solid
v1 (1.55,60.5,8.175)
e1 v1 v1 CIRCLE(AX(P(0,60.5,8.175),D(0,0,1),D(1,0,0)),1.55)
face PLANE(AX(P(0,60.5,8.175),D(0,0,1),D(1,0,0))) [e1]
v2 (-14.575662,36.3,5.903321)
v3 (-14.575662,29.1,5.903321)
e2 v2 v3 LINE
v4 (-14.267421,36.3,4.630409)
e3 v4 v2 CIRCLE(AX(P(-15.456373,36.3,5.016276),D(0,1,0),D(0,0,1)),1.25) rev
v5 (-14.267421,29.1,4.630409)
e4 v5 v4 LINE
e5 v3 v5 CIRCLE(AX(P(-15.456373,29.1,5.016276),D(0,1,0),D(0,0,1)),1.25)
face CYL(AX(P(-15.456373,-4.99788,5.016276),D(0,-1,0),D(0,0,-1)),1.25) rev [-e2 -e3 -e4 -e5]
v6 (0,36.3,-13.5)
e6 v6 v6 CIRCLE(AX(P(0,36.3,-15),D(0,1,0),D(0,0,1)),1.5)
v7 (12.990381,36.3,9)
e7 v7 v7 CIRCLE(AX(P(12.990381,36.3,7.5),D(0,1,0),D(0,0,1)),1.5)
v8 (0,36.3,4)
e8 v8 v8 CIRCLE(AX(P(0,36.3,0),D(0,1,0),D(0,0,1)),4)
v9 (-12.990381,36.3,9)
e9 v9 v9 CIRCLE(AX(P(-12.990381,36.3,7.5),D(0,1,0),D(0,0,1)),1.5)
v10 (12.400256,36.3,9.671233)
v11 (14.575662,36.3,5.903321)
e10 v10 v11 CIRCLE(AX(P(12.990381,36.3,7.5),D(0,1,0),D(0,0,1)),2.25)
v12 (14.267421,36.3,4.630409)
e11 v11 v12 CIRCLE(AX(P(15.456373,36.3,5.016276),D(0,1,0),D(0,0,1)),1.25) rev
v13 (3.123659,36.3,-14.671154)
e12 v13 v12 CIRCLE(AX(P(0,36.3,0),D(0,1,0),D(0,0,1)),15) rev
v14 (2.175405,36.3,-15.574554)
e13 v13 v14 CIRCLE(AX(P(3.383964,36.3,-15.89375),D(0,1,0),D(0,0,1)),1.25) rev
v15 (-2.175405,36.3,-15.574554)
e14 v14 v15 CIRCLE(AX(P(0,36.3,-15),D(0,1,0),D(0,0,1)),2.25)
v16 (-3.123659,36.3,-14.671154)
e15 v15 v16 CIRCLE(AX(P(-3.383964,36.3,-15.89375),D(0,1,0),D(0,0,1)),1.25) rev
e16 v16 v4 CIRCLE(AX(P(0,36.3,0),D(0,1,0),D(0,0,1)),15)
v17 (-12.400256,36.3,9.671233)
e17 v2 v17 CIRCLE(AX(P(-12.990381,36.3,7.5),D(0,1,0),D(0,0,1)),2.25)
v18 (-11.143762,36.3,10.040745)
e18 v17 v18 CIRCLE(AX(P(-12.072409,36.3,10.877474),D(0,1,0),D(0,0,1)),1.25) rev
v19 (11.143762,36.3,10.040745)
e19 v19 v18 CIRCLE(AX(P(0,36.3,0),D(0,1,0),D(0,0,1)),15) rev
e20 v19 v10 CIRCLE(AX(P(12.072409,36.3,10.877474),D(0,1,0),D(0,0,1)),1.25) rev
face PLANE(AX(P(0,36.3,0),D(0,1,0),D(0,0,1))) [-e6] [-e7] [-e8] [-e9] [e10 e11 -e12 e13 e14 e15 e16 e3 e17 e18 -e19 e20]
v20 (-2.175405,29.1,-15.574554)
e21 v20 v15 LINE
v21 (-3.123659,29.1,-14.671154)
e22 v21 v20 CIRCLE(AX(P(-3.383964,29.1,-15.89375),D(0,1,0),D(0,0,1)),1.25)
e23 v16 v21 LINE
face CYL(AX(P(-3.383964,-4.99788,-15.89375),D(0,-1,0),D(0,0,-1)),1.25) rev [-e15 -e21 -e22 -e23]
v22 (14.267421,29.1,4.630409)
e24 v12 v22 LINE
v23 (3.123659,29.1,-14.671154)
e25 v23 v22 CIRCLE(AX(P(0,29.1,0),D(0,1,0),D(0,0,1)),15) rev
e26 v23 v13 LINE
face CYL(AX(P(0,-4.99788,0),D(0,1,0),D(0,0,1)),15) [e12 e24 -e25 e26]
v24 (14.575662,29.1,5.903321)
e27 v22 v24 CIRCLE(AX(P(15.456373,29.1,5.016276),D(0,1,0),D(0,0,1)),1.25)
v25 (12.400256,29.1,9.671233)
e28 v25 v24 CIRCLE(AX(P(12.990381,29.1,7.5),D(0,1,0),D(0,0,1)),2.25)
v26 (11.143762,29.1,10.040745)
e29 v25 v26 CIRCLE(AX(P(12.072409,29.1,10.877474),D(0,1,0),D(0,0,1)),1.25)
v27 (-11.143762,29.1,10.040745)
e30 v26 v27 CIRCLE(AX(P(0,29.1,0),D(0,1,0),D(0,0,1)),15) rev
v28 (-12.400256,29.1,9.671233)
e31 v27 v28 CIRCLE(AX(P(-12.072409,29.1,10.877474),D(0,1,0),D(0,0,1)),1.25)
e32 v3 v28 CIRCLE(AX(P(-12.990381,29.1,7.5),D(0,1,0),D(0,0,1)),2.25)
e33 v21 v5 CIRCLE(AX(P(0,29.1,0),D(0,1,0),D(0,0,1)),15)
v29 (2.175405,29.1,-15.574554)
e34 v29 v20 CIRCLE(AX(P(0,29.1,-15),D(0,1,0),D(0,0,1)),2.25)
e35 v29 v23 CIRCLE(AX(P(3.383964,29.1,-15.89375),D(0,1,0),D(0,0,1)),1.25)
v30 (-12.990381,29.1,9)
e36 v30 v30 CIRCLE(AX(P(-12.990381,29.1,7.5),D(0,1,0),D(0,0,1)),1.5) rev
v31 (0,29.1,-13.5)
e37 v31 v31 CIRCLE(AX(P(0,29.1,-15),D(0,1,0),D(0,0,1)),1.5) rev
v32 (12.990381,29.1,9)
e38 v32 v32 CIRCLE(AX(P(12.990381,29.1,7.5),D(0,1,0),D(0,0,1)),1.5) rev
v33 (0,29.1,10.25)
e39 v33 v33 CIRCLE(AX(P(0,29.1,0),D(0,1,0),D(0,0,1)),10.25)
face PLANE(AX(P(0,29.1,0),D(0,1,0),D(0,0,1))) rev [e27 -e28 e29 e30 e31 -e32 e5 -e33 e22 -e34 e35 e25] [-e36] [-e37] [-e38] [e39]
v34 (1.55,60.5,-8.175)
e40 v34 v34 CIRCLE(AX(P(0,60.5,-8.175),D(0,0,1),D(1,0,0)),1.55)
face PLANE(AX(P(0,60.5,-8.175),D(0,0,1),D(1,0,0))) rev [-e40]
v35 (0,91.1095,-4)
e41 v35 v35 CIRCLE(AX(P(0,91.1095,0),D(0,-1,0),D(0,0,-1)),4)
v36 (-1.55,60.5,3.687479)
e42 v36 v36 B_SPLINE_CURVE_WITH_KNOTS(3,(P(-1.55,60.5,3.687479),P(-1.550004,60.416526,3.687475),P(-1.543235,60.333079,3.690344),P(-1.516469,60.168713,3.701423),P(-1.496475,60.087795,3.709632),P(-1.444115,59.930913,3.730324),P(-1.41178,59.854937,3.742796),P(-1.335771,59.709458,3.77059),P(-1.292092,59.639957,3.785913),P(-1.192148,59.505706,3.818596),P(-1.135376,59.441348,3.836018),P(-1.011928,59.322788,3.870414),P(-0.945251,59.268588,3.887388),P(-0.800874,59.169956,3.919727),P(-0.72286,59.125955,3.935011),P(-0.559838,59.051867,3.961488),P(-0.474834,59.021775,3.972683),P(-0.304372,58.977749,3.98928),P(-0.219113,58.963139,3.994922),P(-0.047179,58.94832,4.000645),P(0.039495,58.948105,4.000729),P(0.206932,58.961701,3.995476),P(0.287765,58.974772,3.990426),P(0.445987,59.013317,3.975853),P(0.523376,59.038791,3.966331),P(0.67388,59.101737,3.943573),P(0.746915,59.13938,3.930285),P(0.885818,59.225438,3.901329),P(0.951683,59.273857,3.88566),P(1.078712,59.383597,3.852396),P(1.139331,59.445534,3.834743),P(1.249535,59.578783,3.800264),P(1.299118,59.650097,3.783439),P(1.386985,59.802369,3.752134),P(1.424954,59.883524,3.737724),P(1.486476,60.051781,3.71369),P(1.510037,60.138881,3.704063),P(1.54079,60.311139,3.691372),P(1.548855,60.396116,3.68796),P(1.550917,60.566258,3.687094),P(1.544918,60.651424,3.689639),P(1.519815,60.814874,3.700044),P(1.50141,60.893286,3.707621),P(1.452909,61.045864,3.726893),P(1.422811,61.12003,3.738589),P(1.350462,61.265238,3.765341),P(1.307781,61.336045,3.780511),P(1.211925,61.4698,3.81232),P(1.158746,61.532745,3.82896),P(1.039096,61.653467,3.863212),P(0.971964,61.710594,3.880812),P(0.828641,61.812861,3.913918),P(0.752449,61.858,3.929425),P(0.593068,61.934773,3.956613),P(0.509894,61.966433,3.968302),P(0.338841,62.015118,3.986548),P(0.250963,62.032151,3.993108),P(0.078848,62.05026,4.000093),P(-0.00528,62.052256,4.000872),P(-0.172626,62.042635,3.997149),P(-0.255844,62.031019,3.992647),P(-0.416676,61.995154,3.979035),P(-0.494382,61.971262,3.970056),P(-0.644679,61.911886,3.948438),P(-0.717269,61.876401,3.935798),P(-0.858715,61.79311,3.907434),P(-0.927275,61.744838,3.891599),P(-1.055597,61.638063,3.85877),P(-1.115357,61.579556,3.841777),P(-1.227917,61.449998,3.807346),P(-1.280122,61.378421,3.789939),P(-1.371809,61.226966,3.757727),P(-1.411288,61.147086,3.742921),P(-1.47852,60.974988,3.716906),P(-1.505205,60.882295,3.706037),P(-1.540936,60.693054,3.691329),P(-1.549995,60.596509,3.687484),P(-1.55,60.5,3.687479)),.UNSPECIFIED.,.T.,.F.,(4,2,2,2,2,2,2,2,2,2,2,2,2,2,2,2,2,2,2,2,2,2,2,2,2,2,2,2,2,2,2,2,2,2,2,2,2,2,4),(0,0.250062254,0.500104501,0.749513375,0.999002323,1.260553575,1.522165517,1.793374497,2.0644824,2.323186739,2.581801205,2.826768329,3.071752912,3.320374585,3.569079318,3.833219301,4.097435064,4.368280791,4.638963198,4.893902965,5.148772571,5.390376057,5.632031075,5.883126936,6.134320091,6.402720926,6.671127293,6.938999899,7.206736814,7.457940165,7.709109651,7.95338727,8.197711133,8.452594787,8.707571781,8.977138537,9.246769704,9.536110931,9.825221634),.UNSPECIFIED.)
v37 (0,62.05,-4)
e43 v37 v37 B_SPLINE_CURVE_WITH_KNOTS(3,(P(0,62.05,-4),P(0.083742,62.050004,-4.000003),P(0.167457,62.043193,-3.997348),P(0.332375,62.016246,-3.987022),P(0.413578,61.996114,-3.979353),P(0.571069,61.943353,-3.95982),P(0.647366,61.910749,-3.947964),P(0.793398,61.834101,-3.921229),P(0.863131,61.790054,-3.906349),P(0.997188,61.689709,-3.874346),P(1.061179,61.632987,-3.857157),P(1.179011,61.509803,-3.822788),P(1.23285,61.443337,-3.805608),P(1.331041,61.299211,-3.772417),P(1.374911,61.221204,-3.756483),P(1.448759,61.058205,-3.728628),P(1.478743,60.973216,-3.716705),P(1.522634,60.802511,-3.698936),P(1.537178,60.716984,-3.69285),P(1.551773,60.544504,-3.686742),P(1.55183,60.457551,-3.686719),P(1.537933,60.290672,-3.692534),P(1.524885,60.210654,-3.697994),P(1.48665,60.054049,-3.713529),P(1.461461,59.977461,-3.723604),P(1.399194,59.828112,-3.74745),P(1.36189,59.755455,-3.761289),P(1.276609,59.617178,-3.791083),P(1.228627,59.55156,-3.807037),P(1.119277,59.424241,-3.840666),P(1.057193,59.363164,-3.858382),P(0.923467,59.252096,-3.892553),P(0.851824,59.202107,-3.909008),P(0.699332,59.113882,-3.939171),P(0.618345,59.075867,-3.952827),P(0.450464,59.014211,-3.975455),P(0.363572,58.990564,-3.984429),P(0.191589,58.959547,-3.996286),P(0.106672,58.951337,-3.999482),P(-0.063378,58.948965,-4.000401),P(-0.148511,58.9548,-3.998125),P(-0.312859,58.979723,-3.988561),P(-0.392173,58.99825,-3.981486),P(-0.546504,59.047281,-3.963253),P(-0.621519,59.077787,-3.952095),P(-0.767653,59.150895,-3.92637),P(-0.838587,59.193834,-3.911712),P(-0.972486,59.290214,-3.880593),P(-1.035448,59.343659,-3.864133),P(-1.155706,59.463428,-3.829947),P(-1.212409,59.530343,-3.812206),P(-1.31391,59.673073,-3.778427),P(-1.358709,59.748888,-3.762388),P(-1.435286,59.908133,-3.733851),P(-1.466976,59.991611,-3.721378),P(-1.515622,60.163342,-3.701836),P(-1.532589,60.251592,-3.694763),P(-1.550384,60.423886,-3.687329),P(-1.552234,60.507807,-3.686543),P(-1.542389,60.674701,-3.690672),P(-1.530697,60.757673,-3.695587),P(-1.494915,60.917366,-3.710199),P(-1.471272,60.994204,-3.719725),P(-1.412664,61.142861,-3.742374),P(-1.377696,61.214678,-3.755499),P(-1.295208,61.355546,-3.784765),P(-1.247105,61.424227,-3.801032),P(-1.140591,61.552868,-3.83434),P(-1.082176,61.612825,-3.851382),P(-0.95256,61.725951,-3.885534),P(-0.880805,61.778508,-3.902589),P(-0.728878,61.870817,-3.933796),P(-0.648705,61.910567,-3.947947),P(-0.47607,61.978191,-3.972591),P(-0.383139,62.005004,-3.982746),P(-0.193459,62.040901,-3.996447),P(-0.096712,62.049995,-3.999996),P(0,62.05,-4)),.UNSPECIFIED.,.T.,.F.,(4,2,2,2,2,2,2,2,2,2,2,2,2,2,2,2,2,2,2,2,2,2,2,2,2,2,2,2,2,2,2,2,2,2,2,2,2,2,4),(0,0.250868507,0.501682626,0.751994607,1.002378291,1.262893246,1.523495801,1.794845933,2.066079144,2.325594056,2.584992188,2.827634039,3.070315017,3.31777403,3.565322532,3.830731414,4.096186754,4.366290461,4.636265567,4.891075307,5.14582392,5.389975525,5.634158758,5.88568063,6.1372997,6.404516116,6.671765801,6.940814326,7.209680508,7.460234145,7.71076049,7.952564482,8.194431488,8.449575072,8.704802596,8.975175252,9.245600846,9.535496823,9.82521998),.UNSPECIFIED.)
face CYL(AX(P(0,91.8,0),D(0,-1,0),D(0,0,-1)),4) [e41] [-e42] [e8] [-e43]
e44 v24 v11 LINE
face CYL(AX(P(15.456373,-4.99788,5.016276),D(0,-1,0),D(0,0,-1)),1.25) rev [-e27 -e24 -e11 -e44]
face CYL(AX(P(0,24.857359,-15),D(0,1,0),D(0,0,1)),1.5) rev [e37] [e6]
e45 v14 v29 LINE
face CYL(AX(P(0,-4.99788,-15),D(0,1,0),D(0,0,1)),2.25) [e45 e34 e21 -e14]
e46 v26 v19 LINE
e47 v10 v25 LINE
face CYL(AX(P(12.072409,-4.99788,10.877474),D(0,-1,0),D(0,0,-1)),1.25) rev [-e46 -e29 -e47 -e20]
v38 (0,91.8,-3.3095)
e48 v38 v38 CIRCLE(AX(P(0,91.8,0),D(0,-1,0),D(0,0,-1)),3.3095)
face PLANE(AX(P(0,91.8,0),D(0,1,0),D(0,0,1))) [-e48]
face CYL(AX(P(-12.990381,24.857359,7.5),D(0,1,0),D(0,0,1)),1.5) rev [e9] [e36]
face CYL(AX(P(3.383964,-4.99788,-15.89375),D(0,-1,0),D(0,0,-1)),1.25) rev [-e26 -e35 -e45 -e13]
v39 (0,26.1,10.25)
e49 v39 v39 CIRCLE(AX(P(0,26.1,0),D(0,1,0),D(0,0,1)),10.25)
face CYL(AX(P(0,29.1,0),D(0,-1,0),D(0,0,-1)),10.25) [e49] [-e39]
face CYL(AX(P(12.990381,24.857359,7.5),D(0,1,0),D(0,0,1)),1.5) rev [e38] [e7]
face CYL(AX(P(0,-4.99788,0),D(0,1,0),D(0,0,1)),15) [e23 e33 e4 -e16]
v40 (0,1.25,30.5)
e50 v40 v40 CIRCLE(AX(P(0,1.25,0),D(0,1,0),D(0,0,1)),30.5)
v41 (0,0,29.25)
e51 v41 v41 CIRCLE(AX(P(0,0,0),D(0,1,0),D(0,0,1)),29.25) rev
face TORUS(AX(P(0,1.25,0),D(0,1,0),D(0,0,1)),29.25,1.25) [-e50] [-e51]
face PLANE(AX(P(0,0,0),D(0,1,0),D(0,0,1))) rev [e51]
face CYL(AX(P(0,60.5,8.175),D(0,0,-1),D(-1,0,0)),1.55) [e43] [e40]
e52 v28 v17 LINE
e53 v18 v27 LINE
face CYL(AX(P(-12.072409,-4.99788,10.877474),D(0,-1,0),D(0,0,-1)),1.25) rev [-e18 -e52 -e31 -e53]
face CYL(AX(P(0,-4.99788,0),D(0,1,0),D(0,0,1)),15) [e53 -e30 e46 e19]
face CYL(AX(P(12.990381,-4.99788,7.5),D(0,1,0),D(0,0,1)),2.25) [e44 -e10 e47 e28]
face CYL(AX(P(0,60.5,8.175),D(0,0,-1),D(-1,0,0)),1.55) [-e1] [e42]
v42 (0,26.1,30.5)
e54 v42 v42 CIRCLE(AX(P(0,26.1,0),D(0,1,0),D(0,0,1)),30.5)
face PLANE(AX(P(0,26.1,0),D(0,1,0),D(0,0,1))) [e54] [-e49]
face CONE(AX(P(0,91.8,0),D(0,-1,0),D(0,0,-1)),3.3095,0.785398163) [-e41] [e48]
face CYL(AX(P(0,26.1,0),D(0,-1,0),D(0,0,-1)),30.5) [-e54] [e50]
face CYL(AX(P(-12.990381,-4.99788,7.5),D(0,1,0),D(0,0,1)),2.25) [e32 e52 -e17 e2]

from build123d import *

# Parameters (mm, degrees)
SKETCH1_R           = 30.5
BOSS_EXTRUDE1_DEPTH = 26.1
SKETCH2_R           = 10.25
BOSS_EXTRUDE2_DEPTH = 3
SKETCH3_R           = 17.25
BOSS_EXTRUDE3_DEPTH = 7.2
CUT_EXTRUDE1_START  = -10.2
CUT_EXTRUDE1_DEPTH  = 10.2
SKETCH4_4_R         = 1.5
CUT_EXTRUDE2_DEPTH  = 7.2
SKETCH7_R           = 4
BOSS_EXTRUDE4_DEPTH = 55.5
FILLET1_R           = 1.25
SKETCH8_R           = 1.55
BOSS_EXTRUDE5_DEPTH = 8.175


# Read off the part's stored shape, not the designer's step: M8x1.25 Machine Threads Stud1
with BuildPart() as part:
    # Sketch1 → Boss-Extrude1 (new body)
    with BuildSketch(Plane(origin=(0, 0, 0), x_dir=(1, 0, 0), z_dir=(0, 1, 0))):
        with Locations(Location((0, 0, 0), (0, 0, 270))):
            Circle(SKETCH1_R)
    extrude(amount=BOSS_EXTRUDE1_DEPTH)

    # Sketch2 → Boss-Extrude2 (add)
    with BuildSketch(Plane(origin=(0, 26.1, 0), x_dir=(1, 0, 0), z_dir=(0, 1, 0))):
        with Locations(Location((0, 0, 0), (0, 0, 270))):
            Circle(SKETCH2_R)
    extrude(amount=BOSS_EXTRUDE2_DEPTH)

    # Sketch3 → Boss-Extrude3 (add)
    with BuildSketch(Plane(origin=(0, 29.1, 0), x_dir=(1, 0, 0), z_dir=(0, 1, 0))):
        with Locations(Location((0, 0, 0), (0, 0, 270))):
            Circle(SKETCH3_R)
    extrude(amount=BOSS_EXTRUDE3_DEPTH)

    # Sketch4 → Cut-Extrude1 (cut)
    with BuildSketch(Plane(origin=(0, 36.3, 0), x_dir=(1, 0, 0), z_dir=(0, 1, 0)).offset(CUT_EXTRUDE1_START)):
        with BuildLine():
            ThreePointArc((-13.966070745, -5.472555887), (-12.990381057, 7.5), (-2.243662951, 14.83125))
            ThreePointArc((-2.243662951, 14.83125), (-1.649573809, 16.530165432), (0, 17.25))
            ThreePointArc((0, 17.25), (-14.938938189, 8.625000045), (-14.938938267, -8.62499991))
            ThreePointArc((-14.938938267, -8.62499991), (-15.140330082, -6.836509843), (-13.966070745, -5.472555887))
        make_face()
        with BuildLine():
            ThreePointArc((2.243662951, 14.83125), (12.990381057, 7.5), (13.966070745, -5.472555887))
            ThreePointArc((13.966070745, -5.472555887), (15.140330099, -6.836509898), (14.938938209, -8.62500001))
            ThreePointArc((14.938938209, -8.62500001), (14.938938218, 8.624999995), (0, 17.25))
            ThreePointArc((0, 17.25), (1.649573809, 16.530165432), (2.243662951, 14.83125))
        make_face()
        with BuildLine():
            ThreePointArc((11.722407794, -9.358694113), (0, -15), (-11.722407794, -9.358694113))
            ThreePointArc((-11.722407794, -9.358694113), (-13.49075634, -9.693655528), (-14.938938267, -8.62499991))
            ThreePointArc((-14.938938267, -8.62499991), (-5.8e-08, -17.25), (14.938938209, -8.62500001))
            ThreePointArc((14.938938209, -8.62500001), (13.490756283, -9.693655541), (11.722407794, -9.358694113))
        make_face()
    extrude(amount=CUT_EXTRUDE1_DEPTH, mode=Mode.SUBTRACT)

    # Sketch4<4> → Cut-Extrude2 (cut)
    with BuildSketch(Plane(origin=(0, 36.3, 0), x_dir=(1, 0, 0), z_dir=(0, 1, 0))):
        with Locations(Location((0, 15, 0), (0, 0, 270))):
            Circle(SKETCH4_4_R)
        with Locations(Location((12.990381057, -7.5, 0), (0, 0, 270))):
            Circle(SKETCH4_4_R)
        with Locations(Location((-12.990381057, -7.5, 0), (0, 0, 270))):
            Circle(SKETCH4_4_R)
    extrude(amount=-CUT_EXTRUDE2_DEPTH, mode=Mode.SUBTRACT)

    # Sketch7 → Boss-Extrude4 (add)
    with BuildSketch(Plane(origin=(0, 36.3, 0), x_dir=(1, 0, 0), z_dir=(0, 1, 0))):
        with Locations(Location((0, 0, 0), (0, 0, 270))):
            Circle(SKETCH7_R)
    extrude(amount=BOSS_EXTRUDE4_DEPTH)

    # Fillet1
    fillet1_edges = [part.edges().sort_by_distance(p)[0] for p in [
        (0, 0, -30.5),
        (-13.966070745, 32.7, 5.472555887),
        (-2.243662951, 32.7, -14.83125),
        (13.966070745, 32.7, 5.472555887),
        (2.243662951, 32.7, -14.83125),
        (-11.722407794, 32.7, 9.358694113),
        (11.722407794, 32.7, 9.358694113),
    ]]
    fillet(fillet1_edges, radius=FILLET1_R)

    # Sketch8 → Boss-Extrude5 (add, symmetric)
    with BuildSketch(Plane.XY):
        with Locations(Location((0, 60.5, 0), (0, 0, 180))):
            Circle(SKETCH8_R)
    extrude(amount=BOSS_EXTRUDE5_DEPTH, both=True)

    # M8x1.25 Machine Threads Stud1 outline → M8x1.25 Machine Threads Stud1 (revolve, cut)
    with BuildSketch(Plane.XY):
        Polygon((4, 91.8), (3.3095, 91.8), (4, 91.1095), align=None)
    revolve(axis=Axis((0, 0, 0), (0, 1, 0)), mode=Mode.SUBTRACT)


solid = part.part
